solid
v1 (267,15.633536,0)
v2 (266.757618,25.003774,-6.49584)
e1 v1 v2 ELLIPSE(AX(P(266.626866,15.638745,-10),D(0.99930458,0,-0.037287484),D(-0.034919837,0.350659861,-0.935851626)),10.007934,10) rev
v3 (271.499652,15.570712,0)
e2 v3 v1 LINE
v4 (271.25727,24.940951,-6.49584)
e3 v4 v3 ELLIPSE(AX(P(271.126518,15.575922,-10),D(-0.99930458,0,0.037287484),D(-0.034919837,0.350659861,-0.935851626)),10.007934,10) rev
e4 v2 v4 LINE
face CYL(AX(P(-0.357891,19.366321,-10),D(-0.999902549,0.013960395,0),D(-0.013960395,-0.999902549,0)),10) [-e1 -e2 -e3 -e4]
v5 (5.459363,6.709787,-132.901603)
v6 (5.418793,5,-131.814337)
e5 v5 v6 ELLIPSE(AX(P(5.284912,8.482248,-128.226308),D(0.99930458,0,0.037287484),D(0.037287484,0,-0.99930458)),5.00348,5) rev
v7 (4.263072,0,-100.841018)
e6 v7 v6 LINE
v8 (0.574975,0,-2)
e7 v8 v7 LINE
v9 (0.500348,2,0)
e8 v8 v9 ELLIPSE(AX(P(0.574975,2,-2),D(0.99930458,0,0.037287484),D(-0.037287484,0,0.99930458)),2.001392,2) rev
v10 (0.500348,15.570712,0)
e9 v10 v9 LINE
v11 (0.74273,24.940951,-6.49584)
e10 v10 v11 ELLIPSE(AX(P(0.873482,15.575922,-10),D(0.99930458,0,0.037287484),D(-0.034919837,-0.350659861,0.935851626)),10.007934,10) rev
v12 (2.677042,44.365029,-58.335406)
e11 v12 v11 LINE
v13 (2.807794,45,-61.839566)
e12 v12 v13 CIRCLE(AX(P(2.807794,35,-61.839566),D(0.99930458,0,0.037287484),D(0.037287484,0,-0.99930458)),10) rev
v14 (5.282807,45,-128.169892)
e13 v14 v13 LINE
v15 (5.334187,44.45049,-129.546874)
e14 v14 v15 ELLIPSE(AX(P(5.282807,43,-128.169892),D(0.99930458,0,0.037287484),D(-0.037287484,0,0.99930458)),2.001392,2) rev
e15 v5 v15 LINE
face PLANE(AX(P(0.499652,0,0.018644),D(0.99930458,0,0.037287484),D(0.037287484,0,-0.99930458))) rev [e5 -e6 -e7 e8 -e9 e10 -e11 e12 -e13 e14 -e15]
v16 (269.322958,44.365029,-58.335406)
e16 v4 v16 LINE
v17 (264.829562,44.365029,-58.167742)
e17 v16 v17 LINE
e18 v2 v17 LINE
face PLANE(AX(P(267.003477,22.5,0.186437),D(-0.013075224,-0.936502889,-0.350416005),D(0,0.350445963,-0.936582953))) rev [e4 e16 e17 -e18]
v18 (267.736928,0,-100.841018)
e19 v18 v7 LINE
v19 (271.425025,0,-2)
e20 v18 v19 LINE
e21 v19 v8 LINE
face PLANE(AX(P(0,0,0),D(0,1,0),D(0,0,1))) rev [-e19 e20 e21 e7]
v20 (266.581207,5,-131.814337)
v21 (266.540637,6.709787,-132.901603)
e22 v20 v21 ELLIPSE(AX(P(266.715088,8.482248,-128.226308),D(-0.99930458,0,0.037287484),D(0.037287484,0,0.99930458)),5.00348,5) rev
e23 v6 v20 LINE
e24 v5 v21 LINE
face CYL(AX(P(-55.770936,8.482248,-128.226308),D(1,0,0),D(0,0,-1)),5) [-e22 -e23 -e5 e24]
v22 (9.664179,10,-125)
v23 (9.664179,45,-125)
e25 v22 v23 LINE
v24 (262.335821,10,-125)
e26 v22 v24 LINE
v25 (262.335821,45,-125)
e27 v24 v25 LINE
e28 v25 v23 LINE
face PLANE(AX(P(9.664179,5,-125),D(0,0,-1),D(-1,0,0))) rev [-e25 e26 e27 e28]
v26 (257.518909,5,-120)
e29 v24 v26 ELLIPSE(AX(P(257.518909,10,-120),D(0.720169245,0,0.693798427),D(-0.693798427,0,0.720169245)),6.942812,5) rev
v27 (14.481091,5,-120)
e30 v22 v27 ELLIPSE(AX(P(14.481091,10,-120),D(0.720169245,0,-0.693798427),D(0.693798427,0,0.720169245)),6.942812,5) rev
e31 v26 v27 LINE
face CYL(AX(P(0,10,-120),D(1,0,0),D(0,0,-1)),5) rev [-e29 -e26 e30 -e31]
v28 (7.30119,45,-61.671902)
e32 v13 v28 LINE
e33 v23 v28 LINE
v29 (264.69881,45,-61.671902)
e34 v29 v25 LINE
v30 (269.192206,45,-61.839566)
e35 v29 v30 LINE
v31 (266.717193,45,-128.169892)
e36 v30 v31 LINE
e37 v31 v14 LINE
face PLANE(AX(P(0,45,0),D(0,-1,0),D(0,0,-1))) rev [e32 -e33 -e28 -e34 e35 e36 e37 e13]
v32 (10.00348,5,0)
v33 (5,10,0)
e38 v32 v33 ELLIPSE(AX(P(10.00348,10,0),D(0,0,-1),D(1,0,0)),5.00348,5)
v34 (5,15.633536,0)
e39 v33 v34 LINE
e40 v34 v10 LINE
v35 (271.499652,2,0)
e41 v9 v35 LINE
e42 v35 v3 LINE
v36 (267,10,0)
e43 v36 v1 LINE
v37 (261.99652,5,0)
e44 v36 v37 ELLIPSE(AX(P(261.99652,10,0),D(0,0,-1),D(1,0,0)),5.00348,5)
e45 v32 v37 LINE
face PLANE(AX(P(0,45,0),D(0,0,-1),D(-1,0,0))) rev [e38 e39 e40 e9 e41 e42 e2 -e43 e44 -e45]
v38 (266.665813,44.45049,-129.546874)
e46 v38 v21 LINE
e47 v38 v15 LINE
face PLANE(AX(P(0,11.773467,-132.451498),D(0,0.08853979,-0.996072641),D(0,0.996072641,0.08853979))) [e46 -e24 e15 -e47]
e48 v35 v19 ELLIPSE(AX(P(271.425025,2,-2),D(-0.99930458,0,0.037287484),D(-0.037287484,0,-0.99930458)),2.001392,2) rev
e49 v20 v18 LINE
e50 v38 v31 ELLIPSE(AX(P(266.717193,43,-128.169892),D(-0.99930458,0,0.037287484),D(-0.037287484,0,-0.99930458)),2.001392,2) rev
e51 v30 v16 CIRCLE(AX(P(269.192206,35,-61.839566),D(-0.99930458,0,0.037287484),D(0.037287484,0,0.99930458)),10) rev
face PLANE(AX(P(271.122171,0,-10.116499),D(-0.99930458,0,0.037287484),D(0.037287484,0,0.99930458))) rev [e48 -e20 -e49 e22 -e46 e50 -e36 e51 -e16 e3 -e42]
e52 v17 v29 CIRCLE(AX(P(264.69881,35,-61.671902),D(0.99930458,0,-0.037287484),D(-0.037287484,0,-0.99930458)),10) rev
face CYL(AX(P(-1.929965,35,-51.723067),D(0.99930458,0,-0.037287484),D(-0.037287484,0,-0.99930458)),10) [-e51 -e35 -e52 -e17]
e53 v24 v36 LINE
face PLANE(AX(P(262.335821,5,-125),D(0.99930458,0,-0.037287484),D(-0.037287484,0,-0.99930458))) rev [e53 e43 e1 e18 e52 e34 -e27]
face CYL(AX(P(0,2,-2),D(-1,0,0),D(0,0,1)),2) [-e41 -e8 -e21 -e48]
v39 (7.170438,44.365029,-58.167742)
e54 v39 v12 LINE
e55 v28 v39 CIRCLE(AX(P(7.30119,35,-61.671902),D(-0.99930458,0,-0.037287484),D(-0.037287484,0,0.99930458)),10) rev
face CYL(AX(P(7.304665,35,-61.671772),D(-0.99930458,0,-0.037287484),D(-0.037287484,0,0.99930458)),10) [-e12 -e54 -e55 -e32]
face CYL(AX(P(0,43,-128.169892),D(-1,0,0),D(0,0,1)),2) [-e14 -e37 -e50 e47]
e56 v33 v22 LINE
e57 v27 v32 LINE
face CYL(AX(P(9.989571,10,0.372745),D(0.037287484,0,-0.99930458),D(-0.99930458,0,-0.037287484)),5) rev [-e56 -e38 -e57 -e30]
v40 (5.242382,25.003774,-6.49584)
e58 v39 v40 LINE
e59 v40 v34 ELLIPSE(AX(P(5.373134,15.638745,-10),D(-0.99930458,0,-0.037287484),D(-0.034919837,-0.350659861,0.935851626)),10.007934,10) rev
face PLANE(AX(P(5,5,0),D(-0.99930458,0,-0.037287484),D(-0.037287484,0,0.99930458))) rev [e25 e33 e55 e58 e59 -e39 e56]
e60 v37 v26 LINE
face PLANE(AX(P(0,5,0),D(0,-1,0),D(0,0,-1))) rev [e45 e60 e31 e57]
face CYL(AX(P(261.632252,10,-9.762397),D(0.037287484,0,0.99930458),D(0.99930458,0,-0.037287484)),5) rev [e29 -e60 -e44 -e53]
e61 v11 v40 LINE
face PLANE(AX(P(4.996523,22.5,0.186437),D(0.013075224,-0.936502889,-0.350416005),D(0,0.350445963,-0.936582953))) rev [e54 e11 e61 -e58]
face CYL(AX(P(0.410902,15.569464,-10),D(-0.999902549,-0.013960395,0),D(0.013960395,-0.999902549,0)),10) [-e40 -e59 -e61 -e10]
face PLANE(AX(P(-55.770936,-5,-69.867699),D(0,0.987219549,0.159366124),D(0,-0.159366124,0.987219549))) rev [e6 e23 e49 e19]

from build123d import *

# Parameters (mm, degrees)
SKETCH1_W           = 272
SKETCH1_H           = 134
BOSS_EXTRUDE2_DEPTH = 45
CUT_EXTRUDE8_DEPTH  = 300
CUT_EXTRUDE10_DEPTH = 300
CUT_EXTRUDE11_DEPTH = 40
CUT_EXTRUDE12_DEPTH = 5
CUT_EXTRUDE13_DEPTH = 5
FILLET1_R           = 10
FILLET2_R           = 5
FILLET3_R           = 10
FILLET5_R           = 2
FILLET6_R           = 2
FILLET7_R           = 2
BOSS_EXTRUDE3_DEPTH = 5
SKETCH18_W          = 22.005693375
SKETCH18_H          = 61.946637546
BOSS_EXTRUDE4_DEPTH = 5
SKETCH19_W          = 26.164660497
SKETCH19_H          = 10
BOSS_EXTRUDE5_DEPTH = 15
CUT_EXTRUDE15_DEPTH = 350
SKETCH22_W          = 22.005693375
SKETCH22_H          = 61.946637546
CUT_EXTRUDE16_DEPTH = 350
CUT_EXTRUDE17_DEPTH = 350
SKETCH26_W          = 366.999535542
SKETCH26_H          = 253.064882437
CUT_EXTRUDE18_DEPTH = 5
FILLET8_R           = 5
SKETCH27_W          = 167.245030015
SKETCH27_H          = 61.468608264
CUT_EXTRUDE19_DEPTH = 0.5
SKETCH28_W          = 245.78388014
SKETCH28_H          = 90.598055895
CUT_EXTRUDE20_DEPTH = 0.5
SKETCH29_W          = 367.28533999
SKETCH29_H          = 77.687990399
CUT_EXTRUDE21_DEPTH = 0.5


with BuildPart() as part:
    # Sketch1 → Boss-Extrude2 (new body)
    with BuildSketch(Plane(origin=(0, 0, 0), x_dir=(1, 0, 0), z_dir=(0, 1, 0))):
        with Locations((136, 67)):
            Rectangle(SKETCH1_W, SKETCH1_H)
    extrude(amount=BOSS_EXTRUDE2_DEPTH)

    # Sketch8 → Cut-Extrude8 (cut)
    with BuildSketch(Plane.ZY):
        Polygon((-134, 45), (-130, 45), (-134, 0), align=None)
    extrude(amount=-CUT_EXTRUDE8_DEPTH, mode=Mode.SUBTRACT)

    # Sketch9 → Cut-Extrude10 (cut)
    with BuildSketch(Plane.XZ):
        Polygon((0, -134), (5, -134), (0, 0), align=None)
        Polygon((272, -134), (267, -134), (272, 0), align=None)
    extrude(amount=-CUT_EXTRUDE10_DEPTH, mode=Mode.SUBTRACT)

    # Sketch11 → Cut-Extrude11 (cut)
    with BuildSketch(Plane(origin=(0, 45, 0), x_dir=(1, 0, 0), z_dir=(0, 1, 0))):
        Polygon((9.664179104, 125), (262.335820896, 125), (267, 0), (5, 0), align=None)
    extrude(amount=-CUT_EXTRUDE11_DEPTH, mode=Mode.SUBTRACT)

    # Sketch12 → Cut-Extrude12 (cut)
    with BuildSketch(Plane(origin=(0, 0, 0), x_dir=(-0.037287484326558824, 0, 0.9993045799517766), z_dir=(-0.9993045799517766, 0, -0.037287484326558824))):
        Polygon((0, 22.5), (-60.090467519, 45), (0, 45), align=None)
    extrude(amount=-CUT_EXTRUDE12_DEPTH, mode=Mode.SUBTRACT)

    # Sketch13 → Cut-Extrude13 (cut)
    with BuildSketch(Plane(origin=(271.621823035, 0, -10.135142651), x_dir=(-0.03728748432655886, 0, -0.9993045799517766), z_dir=(0.9993045799517766, 0, -0.03728748432655886))):
        Polygon((-10.142195737, 22.5), (49.948271782, 45), (-10.142195737, 45), align=None)
    extrude(amount=-CUT_EXTRUDE13_DEPTH, mode=Mode.SUBTRACT)

    # Fillet1
    fillet1_edges = [part.edges().sort_by_distance(p)[0] for p in [
        (2.5, 22.534904388, 0),
        (269.5, 22.534904388, 0),
    ]]
    fillet(fillet1_edges, radius=FILLET1_R)

    # Fillet2
    fillet2_edges = [part.edges().sort_by_distance(p)[0] for p in [
        (7.332089552, 5, -62.5),
        (136, 5, -125),
        (264.667910448, 5, -62.5),
    ]]
    fillet(fillet2_edges, radius=FILLET2_R)

    # Fillet3
    fillet3_edges = [part.edges().sort_by_distance(p)[0] for p in [
        (4.737146475, 45, -59.955525519),
        (267.262853525, 45, -59.955525519),
    ]]
    fillet(fillet3_edges, radius=FILLET3_R)

    # Fillet5
    fillet5_edges = [part.edges().sort_by_distance(p)[0] for p in [
        (136, 0, 0),
    ]]
    fillet(fillet5_edges, radius=FILLET5_R)

    # Fillet6
    fillet6_edges = [part.edges().sort_by_distance(p)[0] for p in [
        (136, 0, -134),
    ]]
    fillet(fillet6_edges, radius=FILLET6_R)

    # Fillet7
    fillet7_edges = [part.edges().sort_by_distance(p)[0] for p in [
        (136, 45, -130),
    ]]
    fillet(fillet7_edges, radius=FILLET7_R)

    # Sketch17 → Boss-Extrude3 (add)
    with BuildSketch(Plane.XZ):
        Polygon((0, 0), (242.409497269, 0), (294.229063893, 0), (294.229063893, -131.814336534), (242.409497269, -131.814336534), (0, -131.814336534), align=None)
    extrude(amount=BOSS_EXTRUDE3_DEPTH)

    # Sketch18 → Boss-Extrude4 (add)
    with BuildSketch(Plane(origin=(0, 0, 0), x_dir=(1, 0, 0), z_dir=(0, 1, 0))):
        with Locations((283.226217206, 100.841017761)):
            Rectangle(SKETCH18_W, SKETCH18_H)
    extrude(amount=BOSS_EXTRUDE4_DEPTH)

    # Sketch19 → Boss-Extrude5 (add)
    with BuildSketch(Plane(origin=(0, 0, -131.814336534), x_dir=(-1, 0, 0), z_dir=(0, 0, -1))):
        with Locations((-281.146733645, 0)):
            Rectangle(SKETCH19_W, SKETCH19_H)
    extrude(amount=BOSS_EXTRUDE5_DEPTH)

    # Sketch21 → Cut-Extrude15 (cut)
    with BuildSketch(Plane(origin=(294.229063893, 0, 0), x_dir=(0, 0, -1), z_dir=(1, 0, 0))):
        Polygon((69.867698988, -5), (131.814336534, 5), (146.814336534, 5), (146.814336534, -5), align=None)
    extrude(amount=-CUT_EXTRUDE15_DEPTH, mode=Mode.SUBTRACT)

    # Sketch22 → Cut-Extrude16 (cut)
    with BuildSketch(Plane(origin=(0, 5, 0), x_dir=(1, 0, 0), z_dir=(0, 1, 0))):
        with Locations((283.226217206, 100.841017761)):
            Rectangle(SKETCH22_W, SKETCH22_H)
    extrude(amount=-CUT_EXTRUDE16_DEPTH, mode=Mode.SUBTRACT)

    # Sketch24 → Cut-Extrude17 (cut)
    with BuildSketch(Plane(origin=(0, 0, 0), x_dir=(1, 0, 0), z_dir=(0, 1, 0))):
        Polygon((294.229063893, 69.867698988), (272.223370518, 69.867698988), (272.223370518, 100.841017761), (268.237275457, 100.841017761), (271.925373134, 2), (271.925373134, 0), (294.229063893, 0), align=None)
    extrude(amount=-CUT_EXTRUDE17_DEPTH, mode=Mode.SUBTRACT)

    # Sketch26 → Cut-Extrude18 (cut)
    with BuildSketch(Plane.XZ.offset(5)):
        with Locations((88.425605363, -126.532441219)):
            Rectangle(SKETCH26_W, SKETCH26_H)
    extrude(amount=-CUT_EXTRUDE18_DEPTH, mode=Mode.SUBTRACT)

    # Fillet8
    # the kernel refuses this fillet: 5 mm, written as the material it takes off along each edge
    with BuildSketch(Plane(origin=(276.867640222, 5, -133.555555556), x_dir=(0, 0.996072640692687, 0.08853979028378928), z_dir=(-1, 0, 0))) as fillet8_piece_1:
        with BuildLine():
            CenterArc((3.94042259, -5), FILLET8_R, 90, 49.222455221)
            Line((0.154167167, -1.734380629), (0.078442059, -1.669068242))
            ThreePointArc((0.078442059, -1.669068242), (-0.022523681, -0.876044294), (-0.099607264, -0.008853979))
            Line((-0.099607264, -0.008853979), (0, 0.1))
            Line((0, 0.1), (3.94042259, 0.1))
            Line((3.94042259, 0.1), (3.94042259, 0))
        make_face()
    extrude(amount=281.735280444, mode=Mode.SUBTRACT)

    # Sketch27 → Cut-Extrude19 (cut)
    with BuildSketch(Plane(origin=(271.621823035, 0, -10.135142651), x_dir=(-0.03728748432655886, 0, -0.9993045799517766), z_dir=(0.9993045799517766, 0, -0.03728748432655886))):
        with Locations((55.876182623, 22.646622557)):
            Rectangle(SKETCH27_W, SKETCH27_H)
    extrude(amount=-CUT_EXTRUDE19_DEPTH, mode=Mode.SUBTRACT)

    # Sketch28 → Cut-Extrude20 (cut)
    with BuildSketch(Plane(origin=(0, 0, 0), x_dir=(-0.037287484326558824, 0, 0.9993045799517766), z_dir=(-0.9993045799517766, 0, -0.037287484326558824))):
        with Locations((-84.953882452, 20.133440951)):
            Rectangle(SKETCH28_W, SKETCH28_H)
    extrude(amount=-CUT_EXTRUDE20_DEPTH, mode=Mode.SUBTRACT)

    # Sketch29 → Cut-Extrude21 (cut)
    with BuildSketch(Plane(origin=(0, 11.817736404, -132.949534542), x_dir=(-1, 0, 0), z_dir=(0, 0.08853979028379444, -0.9960726406926865))):
        with Locations((-152.32774441, 16.969098034)):
            Rectangle(SKETCH29_W, SKETCH29_H)
    extrude(amount=-CUT_EXTRUDE21_DEPTH, mode=Mode.SUBTRACT)


solid = part.part
